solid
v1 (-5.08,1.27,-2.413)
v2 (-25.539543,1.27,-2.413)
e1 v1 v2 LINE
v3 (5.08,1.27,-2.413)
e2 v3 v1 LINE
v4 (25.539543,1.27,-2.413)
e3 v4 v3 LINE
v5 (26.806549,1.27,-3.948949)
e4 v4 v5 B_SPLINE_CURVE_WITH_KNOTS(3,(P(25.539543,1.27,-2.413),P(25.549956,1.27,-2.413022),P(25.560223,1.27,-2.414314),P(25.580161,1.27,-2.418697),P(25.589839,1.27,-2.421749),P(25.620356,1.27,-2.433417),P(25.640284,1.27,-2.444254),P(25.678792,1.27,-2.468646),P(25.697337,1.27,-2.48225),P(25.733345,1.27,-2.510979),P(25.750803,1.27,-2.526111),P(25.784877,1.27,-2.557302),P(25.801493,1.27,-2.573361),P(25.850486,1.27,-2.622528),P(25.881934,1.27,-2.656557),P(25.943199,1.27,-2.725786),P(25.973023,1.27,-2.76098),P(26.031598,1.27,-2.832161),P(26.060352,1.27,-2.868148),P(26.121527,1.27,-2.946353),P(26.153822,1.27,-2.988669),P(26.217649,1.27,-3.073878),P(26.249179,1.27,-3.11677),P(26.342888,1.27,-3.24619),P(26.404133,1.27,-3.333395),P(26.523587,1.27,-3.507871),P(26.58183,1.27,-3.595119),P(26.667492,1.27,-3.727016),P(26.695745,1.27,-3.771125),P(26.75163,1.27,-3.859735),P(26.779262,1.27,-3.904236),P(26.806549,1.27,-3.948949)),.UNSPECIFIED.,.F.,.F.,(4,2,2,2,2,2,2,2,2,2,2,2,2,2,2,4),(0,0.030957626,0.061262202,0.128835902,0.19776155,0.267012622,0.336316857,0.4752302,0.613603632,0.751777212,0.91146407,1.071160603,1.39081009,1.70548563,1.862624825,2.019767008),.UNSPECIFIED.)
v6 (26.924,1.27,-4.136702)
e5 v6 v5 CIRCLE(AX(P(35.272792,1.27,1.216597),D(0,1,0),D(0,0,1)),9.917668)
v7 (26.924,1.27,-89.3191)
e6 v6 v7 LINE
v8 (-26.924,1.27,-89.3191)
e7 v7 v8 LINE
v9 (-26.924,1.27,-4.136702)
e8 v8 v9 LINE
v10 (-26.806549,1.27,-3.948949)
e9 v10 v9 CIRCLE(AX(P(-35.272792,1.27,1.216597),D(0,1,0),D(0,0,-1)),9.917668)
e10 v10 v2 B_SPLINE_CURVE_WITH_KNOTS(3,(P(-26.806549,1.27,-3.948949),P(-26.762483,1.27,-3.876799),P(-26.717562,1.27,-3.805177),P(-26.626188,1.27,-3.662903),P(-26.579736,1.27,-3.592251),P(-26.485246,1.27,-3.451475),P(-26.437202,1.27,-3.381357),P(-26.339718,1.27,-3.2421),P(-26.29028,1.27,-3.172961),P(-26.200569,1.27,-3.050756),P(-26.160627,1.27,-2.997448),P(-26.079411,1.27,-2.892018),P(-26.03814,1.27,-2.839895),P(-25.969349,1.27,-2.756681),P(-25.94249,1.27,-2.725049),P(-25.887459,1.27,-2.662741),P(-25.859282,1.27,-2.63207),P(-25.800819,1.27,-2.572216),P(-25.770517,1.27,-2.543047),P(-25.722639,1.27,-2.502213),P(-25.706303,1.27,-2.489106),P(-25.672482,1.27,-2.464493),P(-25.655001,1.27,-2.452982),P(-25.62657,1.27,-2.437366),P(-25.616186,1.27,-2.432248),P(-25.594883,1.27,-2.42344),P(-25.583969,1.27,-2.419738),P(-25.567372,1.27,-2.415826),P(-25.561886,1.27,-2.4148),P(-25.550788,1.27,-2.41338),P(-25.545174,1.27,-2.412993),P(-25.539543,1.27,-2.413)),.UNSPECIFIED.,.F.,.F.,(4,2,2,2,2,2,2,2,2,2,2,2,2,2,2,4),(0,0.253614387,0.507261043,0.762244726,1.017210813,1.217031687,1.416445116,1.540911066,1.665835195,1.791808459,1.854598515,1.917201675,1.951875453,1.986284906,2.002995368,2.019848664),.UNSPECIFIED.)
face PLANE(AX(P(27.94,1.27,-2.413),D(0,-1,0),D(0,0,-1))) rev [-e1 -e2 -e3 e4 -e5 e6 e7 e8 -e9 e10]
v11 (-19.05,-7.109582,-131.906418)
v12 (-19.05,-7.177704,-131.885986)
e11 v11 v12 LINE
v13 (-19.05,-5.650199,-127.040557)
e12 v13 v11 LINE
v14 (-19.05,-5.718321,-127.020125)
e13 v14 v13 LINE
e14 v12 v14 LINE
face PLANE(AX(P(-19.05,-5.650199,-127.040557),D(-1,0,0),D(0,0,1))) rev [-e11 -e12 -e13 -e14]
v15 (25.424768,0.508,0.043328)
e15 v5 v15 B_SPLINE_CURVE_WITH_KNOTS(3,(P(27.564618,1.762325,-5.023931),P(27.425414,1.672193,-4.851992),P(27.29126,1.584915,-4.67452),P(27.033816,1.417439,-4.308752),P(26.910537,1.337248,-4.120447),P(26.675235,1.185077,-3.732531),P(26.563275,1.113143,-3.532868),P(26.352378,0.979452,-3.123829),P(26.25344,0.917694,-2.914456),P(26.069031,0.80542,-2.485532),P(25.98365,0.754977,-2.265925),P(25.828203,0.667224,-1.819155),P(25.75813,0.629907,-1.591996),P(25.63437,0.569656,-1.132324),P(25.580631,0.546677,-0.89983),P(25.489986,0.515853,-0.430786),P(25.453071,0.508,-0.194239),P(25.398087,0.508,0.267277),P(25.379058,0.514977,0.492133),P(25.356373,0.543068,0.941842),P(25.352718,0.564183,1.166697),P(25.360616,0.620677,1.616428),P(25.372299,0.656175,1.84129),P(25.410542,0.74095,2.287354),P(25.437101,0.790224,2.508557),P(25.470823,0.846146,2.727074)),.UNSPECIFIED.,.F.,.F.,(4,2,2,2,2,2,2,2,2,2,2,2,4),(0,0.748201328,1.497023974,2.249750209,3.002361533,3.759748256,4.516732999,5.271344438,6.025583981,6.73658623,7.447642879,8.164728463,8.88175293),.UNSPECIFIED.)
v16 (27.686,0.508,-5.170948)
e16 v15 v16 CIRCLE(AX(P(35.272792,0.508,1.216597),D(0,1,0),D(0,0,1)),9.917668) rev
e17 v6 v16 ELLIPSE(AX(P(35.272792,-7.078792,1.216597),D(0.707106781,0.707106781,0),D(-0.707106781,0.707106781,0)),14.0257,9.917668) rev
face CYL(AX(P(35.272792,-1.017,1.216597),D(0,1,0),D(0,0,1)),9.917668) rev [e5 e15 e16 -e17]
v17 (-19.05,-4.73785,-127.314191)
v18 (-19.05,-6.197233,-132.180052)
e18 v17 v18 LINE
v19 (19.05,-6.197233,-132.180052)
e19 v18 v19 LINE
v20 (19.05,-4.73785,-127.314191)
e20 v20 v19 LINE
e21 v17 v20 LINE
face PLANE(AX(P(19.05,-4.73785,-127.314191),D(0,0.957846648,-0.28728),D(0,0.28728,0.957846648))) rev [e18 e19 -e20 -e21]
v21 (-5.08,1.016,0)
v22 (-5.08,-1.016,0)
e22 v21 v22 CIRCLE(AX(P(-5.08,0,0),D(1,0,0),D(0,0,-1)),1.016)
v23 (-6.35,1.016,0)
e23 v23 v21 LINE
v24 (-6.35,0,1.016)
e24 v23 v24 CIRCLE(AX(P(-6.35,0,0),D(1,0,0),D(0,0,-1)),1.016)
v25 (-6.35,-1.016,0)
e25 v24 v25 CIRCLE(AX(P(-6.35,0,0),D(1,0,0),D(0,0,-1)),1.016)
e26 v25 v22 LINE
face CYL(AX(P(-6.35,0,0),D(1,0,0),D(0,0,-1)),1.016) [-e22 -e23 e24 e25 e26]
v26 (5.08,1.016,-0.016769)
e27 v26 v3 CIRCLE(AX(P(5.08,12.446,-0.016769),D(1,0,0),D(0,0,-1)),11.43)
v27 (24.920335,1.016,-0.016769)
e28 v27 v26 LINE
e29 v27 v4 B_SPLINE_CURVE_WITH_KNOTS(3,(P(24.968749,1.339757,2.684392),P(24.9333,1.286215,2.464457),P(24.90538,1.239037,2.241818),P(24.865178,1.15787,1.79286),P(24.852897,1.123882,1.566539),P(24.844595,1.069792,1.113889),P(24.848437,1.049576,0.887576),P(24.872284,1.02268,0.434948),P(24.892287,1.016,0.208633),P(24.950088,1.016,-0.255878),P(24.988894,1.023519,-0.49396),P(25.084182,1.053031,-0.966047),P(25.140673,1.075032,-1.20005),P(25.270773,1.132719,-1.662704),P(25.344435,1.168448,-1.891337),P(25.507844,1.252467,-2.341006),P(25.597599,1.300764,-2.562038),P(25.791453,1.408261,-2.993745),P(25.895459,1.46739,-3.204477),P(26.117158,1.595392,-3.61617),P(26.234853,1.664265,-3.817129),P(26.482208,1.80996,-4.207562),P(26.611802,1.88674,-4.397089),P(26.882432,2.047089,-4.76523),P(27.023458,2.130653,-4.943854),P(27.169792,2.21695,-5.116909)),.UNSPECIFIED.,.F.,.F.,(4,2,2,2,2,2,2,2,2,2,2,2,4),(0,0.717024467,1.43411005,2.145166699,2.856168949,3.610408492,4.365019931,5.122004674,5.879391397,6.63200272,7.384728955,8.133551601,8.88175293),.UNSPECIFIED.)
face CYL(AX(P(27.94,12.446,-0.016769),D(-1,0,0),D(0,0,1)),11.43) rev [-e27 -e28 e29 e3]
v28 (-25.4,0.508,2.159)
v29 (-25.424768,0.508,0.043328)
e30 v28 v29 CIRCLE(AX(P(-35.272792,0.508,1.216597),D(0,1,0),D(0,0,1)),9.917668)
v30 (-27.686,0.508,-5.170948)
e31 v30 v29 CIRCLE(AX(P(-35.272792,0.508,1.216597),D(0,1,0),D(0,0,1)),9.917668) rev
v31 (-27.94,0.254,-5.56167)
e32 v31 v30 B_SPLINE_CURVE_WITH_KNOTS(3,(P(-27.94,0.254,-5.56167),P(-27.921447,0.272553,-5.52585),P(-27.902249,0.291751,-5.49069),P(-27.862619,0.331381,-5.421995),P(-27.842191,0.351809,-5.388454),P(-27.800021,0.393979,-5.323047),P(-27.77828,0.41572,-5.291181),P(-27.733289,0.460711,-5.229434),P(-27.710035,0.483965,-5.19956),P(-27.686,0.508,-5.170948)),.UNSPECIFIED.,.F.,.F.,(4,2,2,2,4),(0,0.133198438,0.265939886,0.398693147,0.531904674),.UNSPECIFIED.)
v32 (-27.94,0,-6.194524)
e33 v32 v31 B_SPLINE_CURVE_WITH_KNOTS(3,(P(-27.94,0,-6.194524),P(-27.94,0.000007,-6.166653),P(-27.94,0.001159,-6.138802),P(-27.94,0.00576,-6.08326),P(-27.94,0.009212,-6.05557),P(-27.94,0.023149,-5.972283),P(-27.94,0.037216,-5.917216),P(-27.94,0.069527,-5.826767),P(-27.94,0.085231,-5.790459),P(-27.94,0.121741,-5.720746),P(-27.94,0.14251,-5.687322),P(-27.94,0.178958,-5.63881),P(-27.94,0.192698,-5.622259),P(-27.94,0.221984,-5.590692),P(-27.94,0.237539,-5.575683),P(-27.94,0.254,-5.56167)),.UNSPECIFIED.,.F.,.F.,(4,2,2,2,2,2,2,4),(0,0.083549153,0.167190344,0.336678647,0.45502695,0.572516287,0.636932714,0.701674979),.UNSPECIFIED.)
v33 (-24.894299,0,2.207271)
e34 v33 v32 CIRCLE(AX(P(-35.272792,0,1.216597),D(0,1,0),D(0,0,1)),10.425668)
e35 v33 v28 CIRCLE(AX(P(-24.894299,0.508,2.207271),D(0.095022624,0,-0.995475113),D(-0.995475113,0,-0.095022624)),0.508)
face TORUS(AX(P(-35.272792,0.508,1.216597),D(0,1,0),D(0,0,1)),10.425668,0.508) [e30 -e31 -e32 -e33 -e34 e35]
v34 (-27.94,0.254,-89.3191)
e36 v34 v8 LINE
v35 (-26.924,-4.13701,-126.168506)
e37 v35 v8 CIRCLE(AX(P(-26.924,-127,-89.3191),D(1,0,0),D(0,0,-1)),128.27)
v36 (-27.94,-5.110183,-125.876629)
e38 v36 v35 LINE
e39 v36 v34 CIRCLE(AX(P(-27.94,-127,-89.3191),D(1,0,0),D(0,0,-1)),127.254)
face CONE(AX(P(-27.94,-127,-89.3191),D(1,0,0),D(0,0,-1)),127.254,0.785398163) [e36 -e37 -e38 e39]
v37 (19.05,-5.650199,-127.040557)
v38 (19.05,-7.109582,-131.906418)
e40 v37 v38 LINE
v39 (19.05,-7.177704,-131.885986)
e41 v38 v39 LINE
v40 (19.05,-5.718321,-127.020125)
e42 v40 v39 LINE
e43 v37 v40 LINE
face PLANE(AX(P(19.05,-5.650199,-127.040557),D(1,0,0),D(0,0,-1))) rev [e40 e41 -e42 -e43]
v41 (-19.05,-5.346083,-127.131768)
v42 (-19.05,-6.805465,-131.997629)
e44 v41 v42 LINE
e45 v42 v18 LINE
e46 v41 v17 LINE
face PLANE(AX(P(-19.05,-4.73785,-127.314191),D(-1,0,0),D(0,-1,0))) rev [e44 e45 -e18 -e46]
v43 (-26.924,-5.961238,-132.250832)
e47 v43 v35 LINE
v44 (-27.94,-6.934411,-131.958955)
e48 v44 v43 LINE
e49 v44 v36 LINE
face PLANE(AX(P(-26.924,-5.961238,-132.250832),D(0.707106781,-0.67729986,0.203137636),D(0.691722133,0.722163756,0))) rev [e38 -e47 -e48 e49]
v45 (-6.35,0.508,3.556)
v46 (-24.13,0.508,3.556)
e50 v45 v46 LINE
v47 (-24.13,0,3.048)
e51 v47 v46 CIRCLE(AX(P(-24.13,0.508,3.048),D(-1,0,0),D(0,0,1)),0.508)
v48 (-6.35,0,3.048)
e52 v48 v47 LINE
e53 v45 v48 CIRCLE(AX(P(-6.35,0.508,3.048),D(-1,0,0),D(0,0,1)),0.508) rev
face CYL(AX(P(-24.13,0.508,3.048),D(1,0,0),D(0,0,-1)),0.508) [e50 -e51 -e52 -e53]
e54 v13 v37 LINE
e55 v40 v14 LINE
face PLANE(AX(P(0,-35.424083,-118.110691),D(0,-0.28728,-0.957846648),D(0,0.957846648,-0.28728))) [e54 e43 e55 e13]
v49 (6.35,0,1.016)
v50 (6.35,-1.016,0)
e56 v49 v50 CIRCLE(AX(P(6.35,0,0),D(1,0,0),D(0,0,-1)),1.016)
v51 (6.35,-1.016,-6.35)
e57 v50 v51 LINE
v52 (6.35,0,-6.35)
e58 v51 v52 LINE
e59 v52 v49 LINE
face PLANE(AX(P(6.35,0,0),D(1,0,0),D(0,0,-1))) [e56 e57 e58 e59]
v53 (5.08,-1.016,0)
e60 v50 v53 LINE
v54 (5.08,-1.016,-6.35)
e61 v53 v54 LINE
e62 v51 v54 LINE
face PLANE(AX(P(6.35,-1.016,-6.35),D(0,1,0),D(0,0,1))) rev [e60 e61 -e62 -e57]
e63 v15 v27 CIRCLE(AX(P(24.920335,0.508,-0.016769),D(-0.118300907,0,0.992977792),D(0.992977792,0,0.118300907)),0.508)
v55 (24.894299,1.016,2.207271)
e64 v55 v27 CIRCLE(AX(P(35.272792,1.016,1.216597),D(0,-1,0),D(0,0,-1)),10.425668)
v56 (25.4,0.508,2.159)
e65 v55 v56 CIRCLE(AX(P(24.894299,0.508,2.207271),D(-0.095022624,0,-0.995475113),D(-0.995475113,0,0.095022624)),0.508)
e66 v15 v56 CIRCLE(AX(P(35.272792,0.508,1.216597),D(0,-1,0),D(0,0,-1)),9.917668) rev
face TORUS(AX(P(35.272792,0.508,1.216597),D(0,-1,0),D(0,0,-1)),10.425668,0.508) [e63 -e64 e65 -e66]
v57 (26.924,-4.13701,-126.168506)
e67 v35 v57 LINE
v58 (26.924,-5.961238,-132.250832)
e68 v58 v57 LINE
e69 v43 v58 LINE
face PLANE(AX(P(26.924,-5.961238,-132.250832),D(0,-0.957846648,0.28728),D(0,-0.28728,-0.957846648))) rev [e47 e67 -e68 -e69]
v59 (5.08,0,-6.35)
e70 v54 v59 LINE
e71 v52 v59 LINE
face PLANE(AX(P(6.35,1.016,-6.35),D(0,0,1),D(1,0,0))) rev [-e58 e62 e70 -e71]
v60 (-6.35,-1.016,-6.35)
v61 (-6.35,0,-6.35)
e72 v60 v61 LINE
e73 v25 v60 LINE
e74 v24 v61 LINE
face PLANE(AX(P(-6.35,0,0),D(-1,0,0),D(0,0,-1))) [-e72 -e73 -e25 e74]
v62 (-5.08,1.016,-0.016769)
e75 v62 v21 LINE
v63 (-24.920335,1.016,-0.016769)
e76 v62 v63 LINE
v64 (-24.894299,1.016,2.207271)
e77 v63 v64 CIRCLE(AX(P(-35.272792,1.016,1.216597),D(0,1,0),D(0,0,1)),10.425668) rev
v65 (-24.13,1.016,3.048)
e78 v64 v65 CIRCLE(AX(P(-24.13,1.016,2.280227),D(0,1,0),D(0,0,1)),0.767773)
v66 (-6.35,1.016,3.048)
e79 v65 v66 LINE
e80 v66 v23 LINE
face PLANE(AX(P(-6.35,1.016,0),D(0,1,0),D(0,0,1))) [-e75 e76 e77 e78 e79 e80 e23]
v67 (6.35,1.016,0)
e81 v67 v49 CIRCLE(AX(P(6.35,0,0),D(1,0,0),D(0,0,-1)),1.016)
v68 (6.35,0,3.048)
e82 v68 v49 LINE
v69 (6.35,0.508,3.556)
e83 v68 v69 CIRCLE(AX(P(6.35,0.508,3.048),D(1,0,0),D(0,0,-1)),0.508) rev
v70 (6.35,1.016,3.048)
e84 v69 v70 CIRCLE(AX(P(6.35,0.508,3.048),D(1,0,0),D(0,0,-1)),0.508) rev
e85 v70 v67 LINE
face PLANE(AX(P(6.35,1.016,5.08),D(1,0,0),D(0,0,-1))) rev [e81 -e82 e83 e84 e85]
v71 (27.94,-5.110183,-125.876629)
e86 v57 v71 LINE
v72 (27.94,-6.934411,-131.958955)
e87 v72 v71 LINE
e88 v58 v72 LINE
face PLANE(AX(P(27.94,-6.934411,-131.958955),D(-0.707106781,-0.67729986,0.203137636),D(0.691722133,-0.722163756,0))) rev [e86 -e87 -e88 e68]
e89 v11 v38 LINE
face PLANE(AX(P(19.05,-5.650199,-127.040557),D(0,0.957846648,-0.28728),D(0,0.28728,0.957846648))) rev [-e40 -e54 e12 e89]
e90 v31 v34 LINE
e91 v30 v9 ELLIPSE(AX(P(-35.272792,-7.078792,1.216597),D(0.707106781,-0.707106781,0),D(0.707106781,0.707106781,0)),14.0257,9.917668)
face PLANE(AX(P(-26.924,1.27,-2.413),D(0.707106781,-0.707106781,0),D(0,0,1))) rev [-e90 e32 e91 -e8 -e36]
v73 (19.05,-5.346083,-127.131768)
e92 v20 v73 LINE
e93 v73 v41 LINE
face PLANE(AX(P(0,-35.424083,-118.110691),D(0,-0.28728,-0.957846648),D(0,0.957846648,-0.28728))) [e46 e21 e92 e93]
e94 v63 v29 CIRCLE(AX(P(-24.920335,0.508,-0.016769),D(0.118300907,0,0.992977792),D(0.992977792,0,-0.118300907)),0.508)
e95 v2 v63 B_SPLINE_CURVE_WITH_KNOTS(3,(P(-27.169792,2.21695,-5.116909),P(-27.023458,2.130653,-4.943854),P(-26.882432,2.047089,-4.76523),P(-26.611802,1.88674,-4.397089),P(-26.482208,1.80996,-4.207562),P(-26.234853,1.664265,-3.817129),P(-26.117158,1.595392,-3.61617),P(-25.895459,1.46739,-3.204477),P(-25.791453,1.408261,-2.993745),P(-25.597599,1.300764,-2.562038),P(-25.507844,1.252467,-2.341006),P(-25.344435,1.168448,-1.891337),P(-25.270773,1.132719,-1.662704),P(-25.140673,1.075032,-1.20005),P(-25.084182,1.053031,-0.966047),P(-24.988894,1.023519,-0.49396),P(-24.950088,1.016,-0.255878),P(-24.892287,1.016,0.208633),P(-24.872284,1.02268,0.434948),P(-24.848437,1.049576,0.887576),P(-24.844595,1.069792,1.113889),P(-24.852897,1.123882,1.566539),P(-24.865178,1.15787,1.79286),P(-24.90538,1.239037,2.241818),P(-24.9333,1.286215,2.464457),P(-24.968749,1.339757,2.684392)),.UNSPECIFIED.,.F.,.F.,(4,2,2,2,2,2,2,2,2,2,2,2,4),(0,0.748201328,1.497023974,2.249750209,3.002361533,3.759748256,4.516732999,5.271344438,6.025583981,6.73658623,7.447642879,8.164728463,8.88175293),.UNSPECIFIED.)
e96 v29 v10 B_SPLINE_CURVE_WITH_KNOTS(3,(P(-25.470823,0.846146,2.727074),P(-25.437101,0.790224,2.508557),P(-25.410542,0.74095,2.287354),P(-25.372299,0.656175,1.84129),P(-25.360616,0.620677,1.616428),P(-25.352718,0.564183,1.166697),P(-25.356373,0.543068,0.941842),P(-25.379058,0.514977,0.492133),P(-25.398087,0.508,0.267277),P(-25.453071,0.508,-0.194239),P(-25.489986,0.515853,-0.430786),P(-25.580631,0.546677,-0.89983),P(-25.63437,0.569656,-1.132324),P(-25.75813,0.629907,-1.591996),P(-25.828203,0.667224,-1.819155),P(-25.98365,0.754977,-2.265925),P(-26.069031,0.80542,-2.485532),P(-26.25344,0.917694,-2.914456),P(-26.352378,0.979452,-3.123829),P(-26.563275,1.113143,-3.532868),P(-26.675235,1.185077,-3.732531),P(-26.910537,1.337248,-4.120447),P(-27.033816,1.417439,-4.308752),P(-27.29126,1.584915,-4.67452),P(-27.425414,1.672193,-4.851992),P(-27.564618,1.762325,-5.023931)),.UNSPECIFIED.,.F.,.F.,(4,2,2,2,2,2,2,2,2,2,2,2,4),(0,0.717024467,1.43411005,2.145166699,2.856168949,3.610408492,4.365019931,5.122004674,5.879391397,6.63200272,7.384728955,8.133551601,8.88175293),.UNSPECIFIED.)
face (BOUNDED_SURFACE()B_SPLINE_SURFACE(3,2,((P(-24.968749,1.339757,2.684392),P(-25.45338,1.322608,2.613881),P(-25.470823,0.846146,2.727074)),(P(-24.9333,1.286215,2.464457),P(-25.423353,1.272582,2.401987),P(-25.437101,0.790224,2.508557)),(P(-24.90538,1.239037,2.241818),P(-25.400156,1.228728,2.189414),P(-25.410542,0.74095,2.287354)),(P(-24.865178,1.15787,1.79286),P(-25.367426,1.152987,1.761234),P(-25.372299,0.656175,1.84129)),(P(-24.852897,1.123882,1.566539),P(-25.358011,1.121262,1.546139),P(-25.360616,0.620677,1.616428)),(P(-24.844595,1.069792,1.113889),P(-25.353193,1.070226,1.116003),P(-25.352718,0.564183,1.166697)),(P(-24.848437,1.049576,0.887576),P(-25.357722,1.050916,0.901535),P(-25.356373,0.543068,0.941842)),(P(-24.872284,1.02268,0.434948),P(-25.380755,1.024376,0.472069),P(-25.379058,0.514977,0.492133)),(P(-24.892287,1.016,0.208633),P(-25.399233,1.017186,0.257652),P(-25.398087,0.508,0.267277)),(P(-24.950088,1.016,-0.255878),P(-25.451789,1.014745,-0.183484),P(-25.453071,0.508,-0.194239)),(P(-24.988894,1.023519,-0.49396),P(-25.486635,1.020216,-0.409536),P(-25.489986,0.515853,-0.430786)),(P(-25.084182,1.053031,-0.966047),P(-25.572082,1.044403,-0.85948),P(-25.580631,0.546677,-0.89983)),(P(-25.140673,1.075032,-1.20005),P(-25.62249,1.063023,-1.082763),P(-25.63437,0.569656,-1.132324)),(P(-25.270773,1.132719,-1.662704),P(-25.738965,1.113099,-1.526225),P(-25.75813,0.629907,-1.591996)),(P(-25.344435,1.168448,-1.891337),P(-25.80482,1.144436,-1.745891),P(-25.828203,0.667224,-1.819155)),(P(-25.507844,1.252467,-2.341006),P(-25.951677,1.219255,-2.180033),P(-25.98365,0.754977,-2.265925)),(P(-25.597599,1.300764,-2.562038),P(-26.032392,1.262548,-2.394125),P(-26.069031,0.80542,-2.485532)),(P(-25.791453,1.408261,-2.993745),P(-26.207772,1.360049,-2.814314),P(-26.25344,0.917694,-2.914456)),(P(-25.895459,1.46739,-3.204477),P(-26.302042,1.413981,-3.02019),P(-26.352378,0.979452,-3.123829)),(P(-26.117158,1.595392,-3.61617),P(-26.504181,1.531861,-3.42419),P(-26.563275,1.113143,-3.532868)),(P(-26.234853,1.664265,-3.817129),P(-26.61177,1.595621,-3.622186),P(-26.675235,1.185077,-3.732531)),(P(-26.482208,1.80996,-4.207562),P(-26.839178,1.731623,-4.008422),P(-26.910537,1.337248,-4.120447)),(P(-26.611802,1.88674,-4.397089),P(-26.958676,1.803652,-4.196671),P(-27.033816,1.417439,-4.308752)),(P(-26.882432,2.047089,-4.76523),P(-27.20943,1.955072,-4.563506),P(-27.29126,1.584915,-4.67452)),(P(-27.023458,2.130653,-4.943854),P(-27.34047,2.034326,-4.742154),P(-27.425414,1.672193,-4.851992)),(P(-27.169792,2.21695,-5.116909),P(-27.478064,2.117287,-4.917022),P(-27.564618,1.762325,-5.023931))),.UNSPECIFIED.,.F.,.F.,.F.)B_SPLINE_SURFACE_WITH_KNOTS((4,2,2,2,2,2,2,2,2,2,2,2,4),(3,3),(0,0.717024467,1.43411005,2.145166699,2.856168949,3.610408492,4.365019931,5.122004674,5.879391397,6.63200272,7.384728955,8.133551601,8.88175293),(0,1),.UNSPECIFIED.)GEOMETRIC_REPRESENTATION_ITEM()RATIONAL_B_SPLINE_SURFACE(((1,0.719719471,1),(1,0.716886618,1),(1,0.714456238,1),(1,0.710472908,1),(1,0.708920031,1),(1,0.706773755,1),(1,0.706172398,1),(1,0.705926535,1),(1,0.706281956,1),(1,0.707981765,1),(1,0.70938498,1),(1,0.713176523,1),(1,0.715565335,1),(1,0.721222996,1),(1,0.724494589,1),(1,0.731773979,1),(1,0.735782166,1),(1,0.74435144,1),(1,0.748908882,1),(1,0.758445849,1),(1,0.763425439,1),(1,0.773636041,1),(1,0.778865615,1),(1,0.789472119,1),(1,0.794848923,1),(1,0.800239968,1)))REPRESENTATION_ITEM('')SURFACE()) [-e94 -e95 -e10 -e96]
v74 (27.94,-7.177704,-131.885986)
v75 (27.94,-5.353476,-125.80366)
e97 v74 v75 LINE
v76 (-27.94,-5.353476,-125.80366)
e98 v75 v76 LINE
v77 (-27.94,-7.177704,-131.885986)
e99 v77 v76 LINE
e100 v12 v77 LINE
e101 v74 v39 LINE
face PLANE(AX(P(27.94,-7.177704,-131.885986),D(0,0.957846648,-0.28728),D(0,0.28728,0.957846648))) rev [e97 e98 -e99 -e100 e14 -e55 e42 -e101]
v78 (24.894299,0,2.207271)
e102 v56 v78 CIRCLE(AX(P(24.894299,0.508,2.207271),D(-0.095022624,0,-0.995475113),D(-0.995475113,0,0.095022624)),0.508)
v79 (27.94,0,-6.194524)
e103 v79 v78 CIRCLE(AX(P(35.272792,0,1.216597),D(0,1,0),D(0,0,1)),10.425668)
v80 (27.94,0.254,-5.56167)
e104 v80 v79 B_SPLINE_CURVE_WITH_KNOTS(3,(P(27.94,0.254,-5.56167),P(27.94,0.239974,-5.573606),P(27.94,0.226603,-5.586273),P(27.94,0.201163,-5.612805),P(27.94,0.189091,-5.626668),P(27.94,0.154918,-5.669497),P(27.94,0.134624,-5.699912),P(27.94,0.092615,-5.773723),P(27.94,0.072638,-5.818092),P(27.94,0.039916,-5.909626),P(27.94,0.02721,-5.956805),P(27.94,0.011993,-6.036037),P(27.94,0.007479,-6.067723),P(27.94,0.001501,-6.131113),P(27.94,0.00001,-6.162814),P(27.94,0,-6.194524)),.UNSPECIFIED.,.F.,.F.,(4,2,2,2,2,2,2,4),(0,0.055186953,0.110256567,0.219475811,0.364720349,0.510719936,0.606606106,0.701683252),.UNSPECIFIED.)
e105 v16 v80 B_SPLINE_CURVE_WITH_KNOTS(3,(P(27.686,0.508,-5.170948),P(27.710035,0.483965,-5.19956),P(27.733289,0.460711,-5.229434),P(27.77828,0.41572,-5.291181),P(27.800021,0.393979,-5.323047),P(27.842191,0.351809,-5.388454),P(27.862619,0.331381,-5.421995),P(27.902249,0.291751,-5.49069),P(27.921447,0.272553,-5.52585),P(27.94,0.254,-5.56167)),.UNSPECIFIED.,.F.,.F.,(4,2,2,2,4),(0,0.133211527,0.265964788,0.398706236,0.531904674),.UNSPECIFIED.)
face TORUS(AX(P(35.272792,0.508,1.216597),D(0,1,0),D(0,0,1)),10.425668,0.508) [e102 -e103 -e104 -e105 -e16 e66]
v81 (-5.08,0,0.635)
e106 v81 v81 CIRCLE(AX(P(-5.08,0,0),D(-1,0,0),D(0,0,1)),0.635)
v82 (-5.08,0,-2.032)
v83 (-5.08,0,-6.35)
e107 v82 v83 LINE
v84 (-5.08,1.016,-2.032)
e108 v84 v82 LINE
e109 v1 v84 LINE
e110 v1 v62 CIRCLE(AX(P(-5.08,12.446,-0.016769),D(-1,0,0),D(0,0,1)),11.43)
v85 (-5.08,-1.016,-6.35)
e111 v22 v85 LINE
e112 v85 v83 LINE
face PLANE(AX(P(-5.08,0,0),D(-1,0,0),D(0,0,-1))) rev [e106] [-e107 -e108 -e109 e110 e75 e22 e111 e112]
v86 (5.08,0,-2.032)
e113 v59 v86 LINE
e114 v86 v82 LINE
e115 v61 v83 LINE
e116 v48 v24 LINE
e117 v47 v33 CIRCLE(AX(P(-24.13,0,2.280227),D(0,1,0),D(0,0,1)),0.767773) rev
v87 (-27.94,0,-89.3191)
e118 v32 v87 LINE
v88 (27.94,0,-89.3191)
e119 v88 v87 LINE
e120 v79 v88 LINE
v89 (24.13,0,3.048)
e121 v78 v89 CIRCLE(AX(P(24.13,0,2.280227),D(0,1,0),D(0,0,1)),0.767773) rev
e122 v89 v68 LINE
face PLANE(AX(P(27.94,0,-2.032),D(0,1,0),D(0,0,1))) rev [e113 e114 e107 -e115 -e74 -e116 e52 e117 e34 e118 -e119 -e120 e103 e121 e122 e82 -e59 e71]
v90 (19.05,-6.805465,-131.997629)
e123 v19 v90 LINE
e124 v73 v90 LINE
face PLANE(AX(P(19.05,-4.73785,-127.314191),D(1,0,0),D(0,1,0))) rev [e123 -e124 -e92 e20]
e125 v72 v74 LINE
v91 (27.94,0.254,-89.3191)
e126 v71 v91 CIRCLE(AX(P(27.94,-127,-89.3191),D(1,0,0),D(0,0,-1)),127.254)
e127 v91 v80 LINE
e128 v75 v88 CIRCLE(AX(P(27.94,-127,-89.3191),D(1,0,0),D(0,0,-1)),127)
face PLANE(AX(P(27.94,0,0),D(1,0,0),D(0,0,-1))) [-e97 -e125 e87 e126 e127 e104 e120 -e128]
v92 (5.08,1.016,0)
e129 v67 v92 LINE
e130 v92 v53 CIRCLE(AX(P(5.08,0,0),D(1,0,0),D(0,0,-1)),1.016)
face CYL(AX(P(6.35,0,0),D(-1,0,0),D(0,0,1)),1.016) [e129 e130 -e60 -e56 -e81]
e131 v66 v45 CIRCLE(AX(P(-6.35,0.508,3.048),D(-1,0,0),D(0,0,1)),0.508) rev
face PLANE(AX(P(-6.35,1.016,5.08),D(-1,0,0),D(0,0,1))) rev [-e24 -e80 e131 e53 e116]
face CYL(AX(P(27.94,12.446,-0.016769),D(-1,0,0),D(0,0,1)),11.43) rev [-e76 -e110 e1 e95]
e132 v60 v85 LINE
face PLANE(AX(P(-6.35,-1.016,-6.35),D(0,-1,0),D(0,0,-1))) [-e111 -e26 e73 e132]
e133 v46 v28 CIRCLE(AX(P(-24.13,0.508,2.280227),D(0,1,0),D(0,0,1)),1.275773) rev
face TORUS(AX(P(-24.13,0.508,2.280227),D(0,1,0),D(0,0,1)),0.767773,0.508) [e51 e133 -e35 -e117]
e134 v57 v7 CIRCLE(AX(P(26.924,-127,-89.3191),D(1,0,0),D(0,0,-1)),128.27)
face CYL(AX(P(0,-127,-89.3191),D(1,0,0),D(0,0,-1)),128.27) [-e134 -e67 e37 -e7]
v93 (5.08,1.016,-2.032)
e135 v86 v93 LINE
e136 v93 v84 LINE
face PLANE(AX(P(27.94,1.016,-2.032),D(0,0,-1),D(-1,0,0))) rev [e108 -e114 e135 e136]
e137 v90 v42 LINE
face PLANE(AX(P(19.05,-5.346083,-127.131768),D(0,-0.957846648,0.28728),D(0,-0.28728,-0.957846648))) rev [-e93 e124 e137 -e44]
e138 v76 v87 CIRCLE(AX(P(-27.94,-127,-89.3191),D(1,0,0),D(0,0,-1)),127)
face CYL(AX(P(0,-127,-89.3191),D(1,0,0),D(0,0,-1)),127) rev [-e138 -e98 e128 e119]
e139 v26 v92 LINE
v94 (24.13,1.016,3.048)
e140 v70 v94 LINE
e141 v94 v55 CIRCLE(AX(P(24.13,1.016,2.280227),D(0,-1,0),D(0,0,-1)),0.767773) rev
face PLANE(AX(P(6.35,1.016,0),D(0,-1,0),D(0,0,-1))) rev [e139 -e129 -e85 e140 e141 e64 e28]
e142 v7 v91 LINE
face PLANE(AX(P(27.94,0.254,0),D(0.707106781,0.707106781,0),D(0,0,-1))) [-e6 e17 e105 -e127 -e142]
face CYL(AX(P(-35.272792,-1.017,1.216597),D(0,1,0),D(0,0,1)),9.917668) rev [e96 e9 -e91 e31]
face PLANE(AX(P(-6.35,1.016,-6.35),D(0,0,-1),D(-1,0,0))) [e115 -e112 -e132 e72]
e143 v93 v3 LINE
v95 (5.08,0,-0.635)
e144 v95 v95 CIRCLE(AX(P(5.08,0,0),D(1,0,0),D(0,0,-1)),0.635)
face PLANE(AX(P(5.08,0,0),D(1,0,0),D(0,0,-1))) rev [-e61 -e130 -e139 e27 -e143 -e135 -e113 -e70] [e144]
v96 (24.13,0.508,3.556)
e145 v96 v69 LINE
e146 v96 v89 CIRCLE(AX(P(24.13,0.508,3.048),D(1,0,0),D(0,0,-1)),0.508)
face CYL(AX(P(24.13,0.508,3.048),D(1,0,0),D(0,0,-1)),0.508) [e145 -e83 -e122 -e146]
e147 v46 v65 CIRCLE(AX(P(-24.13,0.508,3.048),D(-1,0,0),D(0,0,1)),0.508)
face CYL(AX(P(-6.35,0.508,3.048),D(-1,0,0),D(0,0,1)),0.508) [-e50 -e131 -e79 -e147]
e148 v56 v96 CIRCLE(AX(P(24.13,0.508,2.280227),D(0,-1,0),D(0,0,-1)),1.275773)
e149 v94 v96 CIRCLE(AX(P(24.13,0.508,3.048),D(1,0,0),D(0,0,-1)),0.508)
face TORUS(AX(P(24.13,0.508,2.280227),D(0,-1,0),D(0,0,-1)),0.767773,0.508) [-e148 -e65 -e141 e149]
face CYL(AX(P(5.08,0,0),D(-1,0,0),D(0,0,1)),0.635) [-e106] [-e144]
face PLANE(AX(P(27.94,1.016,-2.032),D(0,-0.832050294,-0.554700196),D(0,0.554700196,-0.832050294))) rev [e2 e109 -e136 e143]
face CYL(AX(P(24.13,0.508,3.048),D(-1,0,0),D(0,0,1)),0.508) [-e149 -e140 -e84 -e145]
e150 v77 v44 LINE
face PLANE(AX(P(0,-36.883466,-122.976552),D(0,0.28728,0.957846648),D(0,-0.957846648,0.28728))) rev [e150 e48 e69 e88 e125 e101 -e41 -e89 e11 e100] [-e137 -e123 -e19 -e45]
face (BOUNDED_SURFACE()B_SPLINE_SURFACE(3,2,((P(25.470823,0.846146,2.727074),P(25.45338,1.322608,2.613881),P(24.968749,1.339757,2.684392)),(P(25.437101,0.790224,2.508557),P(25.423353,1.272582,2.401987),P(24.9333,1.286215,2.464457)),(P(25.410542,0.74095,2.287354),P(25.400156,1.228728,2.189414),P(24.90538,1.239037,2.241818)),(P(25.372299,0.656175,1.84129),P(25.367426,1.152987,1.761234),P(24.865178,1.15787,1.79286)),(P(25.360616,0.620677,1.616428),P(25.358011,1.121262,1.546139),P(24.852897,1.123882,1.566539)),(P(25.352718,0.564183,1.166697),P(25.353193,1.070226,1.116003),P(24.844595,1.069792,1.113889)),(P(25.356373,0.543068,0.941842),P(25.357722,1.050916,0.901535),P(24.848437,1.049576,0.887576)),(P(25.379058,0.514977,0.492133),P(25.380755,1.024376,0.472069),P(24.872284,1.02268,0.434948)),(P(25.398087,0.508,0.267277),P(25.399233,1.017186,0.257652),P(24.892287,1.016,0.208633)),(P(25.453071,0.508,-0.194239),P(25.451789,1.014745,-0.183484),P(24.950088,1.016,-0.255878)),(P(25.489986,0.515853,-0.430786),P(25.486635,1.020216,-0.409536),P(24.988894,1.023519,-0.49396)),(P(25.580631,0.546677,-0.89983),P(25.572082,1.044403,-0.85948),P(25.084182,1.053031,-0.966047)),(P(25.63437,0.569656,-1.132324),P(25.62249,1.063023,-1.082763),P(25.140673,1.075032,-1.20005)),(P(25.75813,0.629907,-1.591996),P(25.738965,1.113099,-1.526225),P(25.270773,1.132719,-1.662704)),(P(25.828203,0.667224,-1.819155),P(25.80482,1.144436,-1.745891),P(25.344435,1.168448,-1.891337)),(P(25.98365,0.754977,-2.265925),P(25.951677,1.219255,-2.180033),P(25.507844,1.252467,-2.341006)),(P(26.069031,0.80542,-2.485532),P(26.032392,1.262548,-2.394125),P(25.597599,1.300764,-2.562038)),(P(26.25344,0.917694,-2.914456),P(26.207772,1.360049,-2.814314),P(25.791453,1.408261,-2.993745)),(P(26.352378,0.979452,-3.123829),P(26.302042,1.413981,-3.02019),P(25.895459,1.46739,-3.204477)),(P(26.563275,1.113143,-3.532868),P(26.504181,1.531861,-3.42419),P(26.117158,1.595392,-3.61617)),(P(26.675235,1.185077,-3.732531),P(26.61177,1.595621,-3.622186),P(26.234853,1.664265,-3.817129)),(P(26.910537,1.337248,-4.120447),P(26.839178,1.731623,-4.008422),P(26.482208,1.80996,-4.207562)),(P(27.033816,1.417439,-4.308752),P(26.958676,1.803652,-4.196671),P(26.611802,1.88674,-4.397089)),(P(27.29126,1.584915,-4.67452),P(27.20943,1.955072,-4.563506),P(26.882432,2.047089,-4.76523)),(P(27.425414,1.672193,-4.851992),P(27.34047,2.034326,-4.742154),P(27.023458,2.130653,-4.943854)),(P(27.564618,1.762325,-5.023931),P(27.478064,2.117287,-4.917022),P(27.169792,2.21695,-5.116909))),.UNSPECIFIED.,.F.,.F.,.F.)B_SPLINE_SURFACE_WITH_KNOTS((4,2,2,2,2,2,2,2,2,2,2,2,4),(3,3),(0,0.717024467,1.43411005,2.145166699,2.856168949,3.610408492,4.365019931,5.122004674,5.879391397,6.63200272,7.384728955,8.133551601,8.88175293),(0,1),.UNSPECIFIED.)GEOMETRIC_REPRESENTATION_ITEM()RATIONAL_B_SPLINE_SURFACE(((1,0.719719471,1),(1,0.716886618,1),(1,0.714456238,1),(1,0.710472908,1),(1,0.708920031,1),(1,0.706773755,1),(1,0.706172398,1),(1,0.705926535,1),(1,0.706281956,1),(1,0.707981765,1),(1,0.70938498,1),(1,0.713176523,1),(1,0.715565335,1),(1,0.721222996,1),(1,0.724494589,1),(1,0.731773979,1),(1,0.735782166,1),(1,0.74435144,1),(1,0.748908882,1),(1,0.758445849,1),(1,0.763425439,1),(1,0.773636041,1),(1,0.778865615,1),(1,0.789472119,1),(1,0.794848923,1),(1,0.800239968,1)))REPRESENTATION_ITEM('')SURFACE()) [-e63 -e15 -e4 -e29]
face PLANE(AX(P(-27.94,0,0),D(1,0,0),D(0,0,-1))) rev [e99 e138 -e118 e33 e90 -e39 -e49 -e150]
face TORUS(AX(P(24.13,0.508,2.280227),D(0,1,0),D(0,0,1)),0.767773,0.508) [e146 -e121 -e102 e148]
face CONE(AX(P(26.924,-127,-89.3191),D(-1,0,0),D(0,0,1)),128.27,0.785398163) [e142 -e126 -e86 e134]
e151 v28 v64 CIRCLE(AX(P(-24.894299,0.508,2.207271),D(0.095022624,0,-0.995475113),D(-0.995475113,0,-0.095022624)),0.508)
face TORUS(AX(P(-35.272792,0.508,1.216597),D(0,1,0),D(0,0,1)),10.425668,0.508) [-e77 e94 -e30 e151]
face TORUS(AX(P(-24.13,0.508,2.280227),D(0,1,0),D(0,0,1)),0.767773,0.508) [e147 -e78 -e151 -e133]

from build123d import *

# Parameters (mm, degrees)
SKETCH1_R           = 0.635
BOSS_EXTRUDE1_DEPTH = 5.08
BOSS_EXTRUDE2_DEPTH = 1.27
BOSS_EXTRUDE3_DEPTH = 27.94
CHAMFER1_SIZE       = 1.016
BOSS_EXTRUDE4_DEPTH = 7.112
CUT_EXTRUDE1_REACH  = 95.615
FILLET1_R           = 11.43
FILLET2_R           = 0.508
BOSS_EXTRUDE5_DEPTH = 6.35
SKETCH10_W          = 38.1
SKETCH10_H          = 0.635
SKETCH10_H_2        = 1.27
CUT_EXTRUDE2_DEPTH  = 5.08


# Some blends are built 0.0001 mm under size
with BuildPart() as part:
    # Sketch1 → Boss-Extrude1 (new, symmetric)
    with BuildSketch(Plane(origin=(0, 0, 0), x_dir=(0, 0, -1), z_dir=(1, 0, 0))):
        Circle(SKETCH1_R)
    extrude(amount=BOSS_EXTRUDE1_DEPTH, both=True)

    # Sketch2 → Boss-Extrude2 (add)
    with BuildSketch(Plane(origin=(5.08, 0, 0), x_dir=(0, 0, -1), z_dir=(1, 0, 0))):
        with BuildLine():
            Line((0, 1.016), (6.35, 1.016))
            Line((6.35, 1.016), (6.35, -1.016))
            Line((6.35, -1.016), (0, -1.016))
            ThreePointArc((0, -1.016), (-1.016, 0), (0, 1.016))
        make_face()
    boss_extrude2 = extrude(amount=BOSS_EXTRUDE2_DEPTH)

    # Mirror1: Boss-Extrude2 across plane
    add(boss_extrude2.mirror(Plane(origin=(0, 0, 0), x_dir=(0, 0, 1), z_dir=(1, 0, 0))))

    # Sketch4 → Boss-Extrude3 (add, symmetric)
    with BuildSketch(Plane(origin=(0, 0, 0), x_dir=(0, 0, -1), z_dir=(1, 0, 0))):
        Polygon((2.032, 1.016), (2.032, 0), (89.3191, 0), (89.3191, 1.27), (2.413, 1.27), align=None)
    extrude(amount=BOSS_EXTRUDE3_DEPTH, both=True)

    # Chamfer1
    chamfer1_edges = [part.edges().sort_by_distance(p)[0] for p in [
        (-27.94, 1.27, -45.86605),
        (27.94, 1.27, -45.86605),
    ]]
    chamfer(chamfer1_edges, length=CHAMFER1_SIZE)

    # Sketch5 → Boss-Extrude4 (add)
    with BuildSketch(Plane.XY.offset(-2.032)):
        Polygon((6.35, 1.016), (27.178, 1.016), (27.94, 0.254), (27.94, 0), (27.178, 0), (6.35, 0), align=None)
        Polygon((-27.94, 0), (-27.178, 0), (-6.35, 0), (-6.35, 1.016), (-27.178, 1.016), (-27.94, 0.254), align=None)
    extrude(amount=BOSS_EXTRUDE4_DEPTH)

    # Sketch6 → Cut-Extrude1 (cut, up to next)
    with BuildSketch(Plane(origin=(0, 1.27, 0), x_dir=(1, 0, 0), z_dir=(0, 1, 0)), mode=Mode.PRIVATE) as cut_extrude1_sk1:
        with BuildLine():
            Line((24.13, -3.556), (6.35, -3.556))
            Line((6.35, -3.556), (6.35, -5.08))
            Line((6.35, -5.08), (27.94, -5.08))
            Line((27.94, -5.08), (27.94, 5.461))
            ThreePointArc((27.94, 5.461), (25.86406568, 1.919644773), (25.4, -2.159))
            ThreePointArc((25.4, -2.159), (25.073995365, -3.138404878), (24.13, -3.556))
        make_face()
    cut_extrude1_tool1 = extrude(cut_extrude1_sk1.sketch, amount=-CUT_EXTRUDE1_REACH, mode=Mode.PRIVATE) & part.part
    # Sketch6 → Cut-Extrude1 (cut, up to next)
    with BuildSketch(Plane(origin=(0, 1.27, 0), x_dir=(1, 0, 0), z_dir=(0, 1, 0)), mode=Mode.PRIVATE) as cut_extrude1_sk2:
        with BuildLine():
            Line((-27.94, -5.08), (-27.94, 5.461))
            ThreePointArc((-27.94, 5.461), (-25.86406568, 1.919644773), (-25.4, -2.159))
            ThreePointArc((-25.4, -2.159), (-25.073995365, -3.138404878), (-24.13, -3.556))
            Line((-24.13, -3.556), (-6.35, -3.556))
            Line((-6.35, -3.556), (-6.35, -5.08))
            Line((-6.35, -5.08), (-27.94, -5.08))
        make_face()
    cut_extrude1_tool2 = extrude(cut_extrude1_sk2.sketch, amount=-CUT_EXTRUDE1_REACH, mode=Mode.PRIVATE) & part.part
    add(cut_extrude1_tool1.solids().sort_by_distance((26.091995, 1.27, -1.843668))[0], mode=Mode.SUBTRACT)
    add(cut_extrude1_tool2.solids().sort_by_distance((-27.699742, 1.27, -0.1905))[0], mode=Mode.SUBTRACT)

    # Fillet1
    # the kernel refuses this fillet: 11.43 mm, written as the material it adds along each edge
    with BuildSketch(Plane(origin=(5.08, 1.016, -2.032), x_dir=(0, 0.5547001962252287, -0.832050294337844), z_dir=(1, 0, 0))) as fillet1_piece_1_section:
        with BuildLine():
            CenterArc((4.663449523, 10.628184011), FILLET1_R, 236.309932474, 12.101492032)
            Line((-1.676773719, 1.117849146), (0, 0))
            Line((0, 0), (0.457905012, 0))
        make_face()
    fillet1_piece_1 = extrude(amount=25.860343839, mode=Mode.PRIVATE)
    fillet1_piece_1 = fillet1_piece_1 - Plane(origin=(35.272791519, 1.208479731, 1.216597173), x_dir=(-0.7393665158371048, 0, -0.6733031674208139), z_dir=(0, 1, 0)) * Cylinder(9.917667845, 59, mode=Mode.PRIVATE)
    add(fillet1_piece_1)
    with BuildSketch(Plane(origin=(-30.940343839, 1.016, -2.032), x_dir=(0, 0.5547001962260483, -0.8320502943372975), z_dir=(1, 0, 0))) as fillet1_piece_2_section:
        with BuildLine():
            CenterArc((4.663449523, 10.628184011), FILLET1_R, 236.309932474, 12.101492032)
            Line((-1.676773719, 1.117849146), (0, 0))
            Line((0, 0), (0.457905012, 0))
        make_face()
    fillet1_piece_2 = extrude(amount=25.860343839, mode=Mode.PRIVATE)
    fillet1_piece_2 = fillet1_piece_2 - Plane(origin=(-35.272791519, 1.208479731, 1.216597173), x_dir=(0.7393665158371048, 0, -0.6733031674208138), z_dir=(0, 1, 0)) * Cylinder(9.917667845, 59, mode=Mode.PRIVATE)
    add(fillet1_piece_2)

    # Fillet2
    fillet2_edges = [part.edges().sort_by_distance(p)[0] for p in [
        (-25.86406568, 0, -1.919644773),
        (-15.24, 0, 3.556),
        (-25.669565682, 1.08391662, -1.260939708),
        (-25.356203761, 1.016, 1.070232197),
        (-15.24, 1.016, 3.556),
        (25.86406568, 0, -1.919644773),
        (25.073995365, 0, 3.138404878),
        (25.669564301, 1.083916034, -1.260934355),
        (25.356203761, 1.016, 1.070232197),
        (25.073995365, 1.016, 3.138404878),
        (-25.073995365, 0, 3.138404878),
        (-25.073995365, 1.016, 3.138404878),
        (15.24, 0, 3.556),
        (15.24, 1.016, 3.556),
    ]]
    fillet(fillet2_edges, radius=FILLET2_R - 0.0001)  # a hair under: the kernel refuses the full size

    # Sweep1: sweep along a path in Sketch8
    with BuildLine(Plane(origin=(0, 0, 0), x_dir=(0, 0, -1), z_dir=(1, 0, 0))) as sweep1_path:
        ThreePointArc((89.3191, 0), (107.756716577, -1.34549632), (125.80366, -5.35347567))
    # Sketch7 → Sweep1 (sweep)
    with BuildSketch(Plane(origin=(0, 0, -89.3191), x_dir=(-1, 0, 0), z_dir=(0, 0, -1))):
        Polygon((-27.94, 0), (-27.94, 0.254), (-26.924, 1.27), (26.924, 1.27), (27.94, 0.254), (27.94, 0), align=None)
    sweep(path=sweep1_path.line)

    # Sketch9 → Boss-Extrude5 (add)
    with BuildSketch(Plane(origin=(0, -35.059237678, -116.894226193), x_dir=(-1, 0, 0), z_dir=(0, -0.28728000000000004, -0.957846648268918))):
        Polygon((-27.94, 31.013066718), (-27.94, 31.267066718), (-26.924, 32.283066718), (26.924, 32.283066718), (27.94, 31.267066718), (27.94, 31.013066718), align=None)
    extrude(amount=BOSS_EXTRUDE5_DEPTH)

    # Sketch10 → Cut-Extrude2 (cut)
    with BuildSketch(Plane(origin=(0, -36.883465678, -122.97655241), x_dir=(-1, 0, 0), z_dir=(0, -0.28727999999993675, -0.9578466482689367))):
        with Locations((0, 31.719186718)):
            Rectangle(SKETCH10_W, SKETCH10_H)
        with Locations((0, 30.449186718)):
            Rectangle(SKETCH10_W, SKETCH10_H_2)
    extrude(amount=-CUT_EXTRUDE2_DEPTH, mode=Mode.SUBTRACT)


solid = part.part
